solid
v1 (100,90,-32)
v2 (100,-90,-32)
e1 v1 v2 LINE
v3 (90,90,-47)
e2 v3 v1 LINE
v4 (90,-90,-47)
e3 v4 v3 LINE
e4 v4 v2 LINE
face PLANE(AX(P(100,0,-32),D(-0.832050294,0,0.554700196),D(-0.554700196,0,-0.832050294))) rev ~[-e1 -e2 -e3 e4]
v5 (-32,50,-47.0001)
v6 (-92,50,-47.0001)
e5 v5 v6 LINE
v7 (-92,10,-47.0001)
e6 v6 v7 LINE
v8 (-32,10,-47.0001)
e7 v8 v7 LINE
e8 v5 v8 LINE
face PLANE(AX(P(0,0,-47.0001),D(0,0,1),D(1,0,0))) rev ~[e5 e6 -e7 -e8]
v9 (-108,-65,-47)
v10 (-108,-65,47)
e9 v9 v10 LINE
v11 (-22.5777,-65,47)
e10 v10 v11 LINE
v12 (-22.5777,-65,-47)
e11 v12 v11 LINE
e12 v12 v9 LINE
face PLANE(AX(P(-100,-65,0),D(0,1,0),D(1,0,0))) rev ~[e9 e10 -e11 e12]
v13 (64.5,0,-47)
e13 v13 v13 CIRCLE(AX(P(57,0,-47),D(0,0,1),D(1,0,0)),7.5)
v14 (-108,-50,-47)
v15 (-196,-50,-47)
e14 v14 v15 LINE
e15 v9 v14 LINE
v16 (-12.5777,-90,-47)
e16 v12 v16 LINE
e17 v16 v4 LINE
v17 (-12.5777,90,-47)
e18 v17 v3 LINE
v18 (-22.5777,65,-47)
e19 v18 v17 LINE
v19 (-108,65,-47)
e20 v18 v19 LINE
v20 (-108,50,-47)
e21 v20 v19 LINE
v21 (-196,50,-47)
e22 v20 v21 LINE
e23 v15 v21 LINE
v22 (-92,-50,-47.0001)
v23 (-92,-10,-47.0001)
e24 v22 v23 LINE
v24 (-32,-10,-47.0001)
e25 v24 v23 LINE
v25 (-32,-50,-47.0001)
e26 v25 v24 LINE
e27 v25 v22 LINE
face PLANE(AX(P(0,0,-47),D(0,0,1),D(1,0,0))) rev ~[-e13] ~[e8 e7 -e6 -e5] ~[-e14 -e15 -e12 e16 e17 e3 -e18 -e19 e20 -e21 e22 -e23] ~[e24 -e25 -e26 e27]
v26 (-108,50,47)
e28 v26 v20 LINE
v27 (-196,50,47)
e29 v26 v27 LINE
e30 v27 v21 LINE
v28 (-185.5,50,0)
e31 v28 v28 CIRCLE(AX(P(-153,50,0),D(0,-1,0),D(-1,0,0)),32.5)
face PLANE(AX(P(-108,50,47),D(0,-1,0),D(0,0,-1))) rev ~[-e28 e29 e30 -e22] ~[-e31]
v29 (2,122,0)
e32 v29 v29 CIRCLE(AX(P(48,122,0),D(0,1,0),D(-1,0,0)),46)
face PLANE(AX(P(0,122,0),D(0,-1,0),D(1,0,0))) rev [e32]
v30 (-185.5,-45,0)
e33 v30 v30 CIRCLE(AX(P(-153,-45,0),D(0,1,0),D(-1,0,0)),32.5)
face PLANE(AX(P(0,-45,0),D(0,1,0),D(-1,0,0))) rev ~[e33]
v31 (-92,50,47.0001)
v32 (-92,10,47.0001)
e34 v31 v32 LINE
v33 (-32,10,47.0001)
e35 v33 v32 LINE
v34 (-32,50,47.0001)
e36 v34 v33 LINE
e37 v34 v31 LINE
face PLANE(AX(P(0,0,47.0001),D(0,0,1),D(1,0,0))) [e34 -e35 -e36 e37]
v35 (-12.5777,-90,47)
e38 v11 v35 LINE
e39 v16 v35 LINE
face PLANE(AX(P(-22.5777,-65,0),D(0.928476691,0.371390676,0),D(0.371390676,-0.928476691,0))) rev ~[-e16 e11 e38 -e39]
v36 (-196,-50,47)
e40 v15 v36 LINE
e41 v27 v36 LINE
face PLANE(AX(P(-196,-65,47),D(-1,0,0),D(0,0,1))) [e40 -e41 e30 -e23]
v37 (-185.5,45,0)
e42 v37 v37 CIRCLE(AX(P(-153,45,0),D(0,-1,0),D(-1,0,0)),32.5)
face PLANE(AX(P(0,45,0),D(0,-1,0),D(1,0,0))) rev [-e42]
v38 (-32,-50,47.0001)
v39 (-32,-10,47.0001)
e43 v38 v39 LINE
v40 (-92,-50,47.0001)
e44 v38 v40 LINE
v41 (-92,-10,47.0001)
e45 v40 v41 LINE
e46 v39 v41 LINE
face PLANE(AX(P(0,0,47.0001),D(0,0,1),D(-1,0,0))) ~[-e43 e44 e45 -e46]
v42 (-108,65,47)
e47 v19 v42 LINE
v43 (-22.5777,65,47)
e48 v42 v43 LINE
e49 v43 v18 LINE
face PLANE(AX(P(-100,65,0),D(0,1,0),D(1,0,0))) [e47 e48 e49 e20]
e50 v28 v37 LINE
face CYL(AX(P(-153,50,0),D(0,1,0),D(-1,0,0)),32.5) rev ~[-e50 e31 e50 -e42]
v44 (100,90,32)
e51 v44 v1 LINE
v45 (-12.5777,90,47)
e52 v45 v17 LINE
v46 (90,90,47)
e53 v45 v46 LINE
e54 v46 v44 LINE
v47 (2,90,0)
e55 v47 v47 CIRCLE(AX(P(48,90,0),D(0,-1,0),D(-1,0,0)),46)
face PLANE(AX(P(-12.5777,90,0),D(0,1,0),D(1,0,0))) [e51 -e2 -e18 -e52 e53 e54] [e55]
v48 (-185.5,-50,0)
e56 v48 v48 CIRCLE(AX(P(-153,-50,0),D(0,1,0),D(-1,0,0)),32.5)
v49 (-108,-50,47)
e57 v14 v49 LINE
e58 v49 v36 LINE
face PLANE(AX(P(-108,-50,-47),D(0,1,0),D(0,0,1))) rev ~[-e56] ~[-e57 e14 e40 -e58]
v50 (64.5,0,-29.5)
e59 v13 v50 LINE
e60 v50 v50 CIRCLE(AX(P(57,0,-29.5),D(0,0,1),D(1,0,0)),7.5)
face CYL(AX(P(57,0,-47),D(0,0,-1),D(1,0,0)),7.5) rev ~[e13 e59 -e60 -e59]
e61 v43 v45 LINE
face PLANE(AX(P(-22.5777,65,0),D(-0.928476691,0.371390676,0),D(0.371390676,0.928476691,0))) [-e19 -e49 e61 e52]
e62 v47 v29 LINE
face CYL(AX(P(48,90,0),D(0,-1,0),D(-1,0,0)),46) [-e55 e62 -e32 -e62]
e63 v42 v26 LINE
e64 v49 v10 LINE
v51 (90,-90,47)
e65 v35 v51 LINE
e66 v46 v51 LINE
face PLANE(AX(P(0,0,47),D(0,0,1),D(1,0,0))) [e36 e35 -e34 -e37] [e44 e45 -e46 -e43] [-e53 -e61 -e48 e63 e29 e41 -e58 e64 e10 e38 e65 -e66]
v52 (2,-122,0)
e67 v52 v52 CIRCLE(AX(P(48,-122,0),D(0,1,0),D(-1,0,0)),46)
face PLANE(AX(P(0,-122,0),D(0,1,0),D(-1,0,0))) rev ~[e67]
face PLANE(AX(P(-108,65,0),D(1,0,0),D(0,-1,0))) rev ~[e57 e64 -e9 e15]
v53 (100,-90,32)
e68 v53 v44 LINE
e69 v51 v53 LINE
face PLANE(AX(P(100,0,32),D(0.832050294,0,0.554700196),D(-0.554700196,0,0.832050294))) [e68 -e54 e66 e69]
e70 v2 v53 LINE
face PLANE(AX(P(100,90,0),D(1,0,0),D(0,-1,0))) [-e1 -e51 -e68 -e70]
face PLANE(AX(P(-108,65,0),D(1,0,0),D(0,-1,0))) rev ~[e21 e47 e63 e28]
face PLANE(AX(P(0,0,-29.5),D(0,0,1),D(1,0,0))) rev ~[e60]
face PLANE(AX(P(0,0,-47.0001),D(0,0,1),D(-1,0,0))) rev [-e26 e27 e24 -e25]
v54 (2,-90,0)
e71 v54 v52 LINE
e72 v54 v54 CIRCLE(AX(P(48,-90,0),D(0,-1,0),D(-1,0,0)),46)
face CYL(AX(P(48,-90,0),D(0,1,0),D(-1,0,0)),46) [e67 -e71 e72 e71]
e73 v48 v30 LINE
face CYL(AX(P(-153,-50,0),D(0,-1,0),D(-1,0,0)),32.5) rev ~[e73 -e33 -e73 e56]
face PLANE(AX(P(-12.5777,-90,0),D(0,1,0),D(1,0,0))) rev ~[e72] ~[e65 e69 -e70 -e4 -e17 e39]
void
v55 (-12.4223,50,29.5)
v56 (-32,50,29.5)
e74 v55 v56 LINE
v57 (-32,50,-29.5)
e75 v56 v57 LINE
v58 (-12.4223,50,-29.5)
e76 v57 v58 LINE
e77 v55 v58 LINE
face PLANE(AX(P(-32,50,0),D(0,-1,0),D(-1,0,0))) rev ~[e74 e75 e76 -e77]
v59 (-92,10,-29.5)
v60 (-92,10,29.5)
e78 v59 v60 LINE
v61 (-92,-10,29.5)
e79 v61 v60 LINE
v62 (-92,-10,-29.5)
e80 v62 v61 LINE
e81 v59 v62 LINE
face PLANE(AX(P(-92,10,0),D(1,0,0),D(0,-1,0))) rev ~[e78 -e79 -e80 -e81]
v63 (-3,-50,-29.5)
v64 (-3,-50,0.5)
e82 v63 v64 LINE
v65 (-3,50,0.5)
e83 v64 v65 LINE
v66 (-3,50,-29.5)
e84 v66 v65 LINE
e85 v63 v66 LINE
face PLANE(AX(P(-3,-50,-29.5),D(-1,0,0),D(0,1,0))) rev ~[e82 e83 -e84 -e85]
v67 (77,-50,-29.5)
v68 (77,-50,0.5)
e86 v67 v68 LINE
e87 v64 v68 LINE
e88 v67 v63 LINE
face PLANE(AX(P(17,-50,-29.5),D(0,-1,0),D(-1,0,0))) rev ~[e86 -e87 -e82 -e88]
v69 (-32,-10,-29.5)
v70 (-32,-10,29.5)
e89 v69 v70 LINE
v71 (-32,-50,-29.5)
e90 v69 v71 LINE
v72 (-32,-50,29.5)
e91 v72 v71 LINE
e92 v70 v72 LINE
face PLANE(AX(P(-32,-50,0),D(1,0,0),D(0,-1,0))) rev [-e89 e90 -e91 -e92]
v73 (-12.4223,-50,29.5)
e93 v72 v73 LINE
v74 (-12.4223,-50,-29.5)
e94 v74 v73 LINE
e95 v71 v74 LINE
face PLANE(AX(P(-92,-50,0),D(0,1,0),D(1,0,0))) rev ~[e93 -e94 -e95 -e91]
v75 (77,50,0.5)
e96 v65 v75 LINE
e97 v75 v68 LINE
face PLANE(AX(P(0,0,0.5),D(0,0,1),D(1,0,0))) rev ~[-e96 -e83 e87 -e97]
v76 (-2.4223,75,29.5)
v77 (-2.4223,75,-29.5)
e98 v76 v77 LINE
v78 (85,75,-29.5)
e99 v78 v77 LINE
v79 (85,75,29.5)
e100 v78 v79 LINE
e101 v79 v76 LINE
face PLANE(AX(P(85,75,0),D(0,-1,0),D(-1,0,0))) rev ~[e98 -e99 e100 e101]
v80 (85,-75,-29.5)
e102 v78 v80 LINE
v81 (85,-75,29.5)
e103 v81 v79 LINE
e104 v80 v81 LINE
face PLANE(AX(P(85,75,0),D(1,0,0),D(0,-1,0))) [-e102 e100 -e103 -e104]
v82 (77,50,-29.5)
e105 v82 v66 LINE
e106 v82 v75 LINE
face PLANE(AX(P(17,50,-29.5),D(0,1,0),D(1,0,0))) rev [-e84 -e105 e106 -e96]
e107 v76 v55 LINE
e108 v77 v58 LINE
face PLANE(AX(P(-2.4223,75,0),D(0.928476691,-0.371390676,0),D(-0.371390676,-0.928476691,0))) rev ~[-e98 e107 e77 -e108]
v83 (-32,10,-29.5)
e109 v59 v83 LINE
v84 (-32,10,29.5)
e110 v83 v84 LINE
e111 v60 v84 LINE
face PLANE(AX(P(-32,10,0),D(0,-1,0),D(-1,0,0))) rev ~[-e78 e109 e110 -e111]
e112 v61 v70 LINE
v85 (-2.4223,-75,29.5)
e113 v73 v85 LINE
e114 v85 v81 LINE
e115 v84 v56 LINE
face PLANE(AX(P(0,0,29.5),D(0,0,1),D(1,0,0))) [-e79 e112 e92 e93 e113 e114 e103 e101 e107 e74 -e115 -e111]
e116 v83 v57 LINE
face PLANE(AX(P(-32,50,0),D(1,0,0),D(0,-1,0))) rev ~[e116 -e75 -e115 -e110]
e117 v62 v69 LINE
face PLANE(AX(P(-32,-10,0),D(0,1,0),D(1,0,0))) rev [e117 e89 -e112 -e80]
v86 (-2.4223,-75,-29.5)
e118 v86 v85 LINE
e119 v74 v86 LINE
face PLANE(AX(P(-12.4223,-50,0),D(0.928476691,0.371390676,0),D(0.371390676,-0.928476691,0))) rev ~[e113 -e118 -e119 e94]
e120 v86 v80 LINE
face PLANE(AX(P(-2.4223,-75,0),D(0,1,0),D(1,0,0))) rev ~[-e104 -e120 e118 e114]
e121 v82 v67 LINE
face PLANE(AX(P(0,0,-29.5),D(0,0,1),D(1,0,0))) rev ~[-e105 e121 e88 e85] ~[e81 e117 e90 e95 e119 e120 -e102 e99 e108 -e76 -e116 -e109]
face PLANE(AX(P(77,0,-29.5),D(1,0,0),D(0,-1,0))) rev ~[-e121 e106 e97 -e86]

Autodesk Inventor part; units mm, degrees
ref_plane "YZ Plane" through (0, 0, 0) normal (1, 0, 0) x (0, 1, 0)
ref_plane "XZ Plane" through (0, 0, 0) normal (0, 1, 0) x (-1, 0, 0)
sketch "Sketch1" plane through (0, 0, 0) normal (0, 0, 1) x (1, 0, 0)
  line L0 (-100, 0) -> (100, 0) construction
  line L1 (-100, 65) -> (-100, -65)
  circle A0 centre (-52.5, 57.5) radius 2.25
  line L2 (100, -70) -> (100, 70) construction
  line L3 (-92, 0) -> (-92, 57.5) construction
  line L4 (-92, 0) -> (-92, -57.5) construction
  circle A1 centre (-92.5, 57.5) radius 2.25
  circle A2 centre (-92.5, 57.5) radius 1.25
  circle A3 centre (-52.5, 57.5) radius 1.25
  line L5 (-100, 65) -> (-22.5777, 65)
  line L6 (-22.5777, 65) -> (-12.5777, 90)
  line L7 (-12.5777, 90) -> (100, 90)
  line L8 (100, 90) -> (100, 0)
  line L9 (100, -90) -> (100, 0)
  line L10 (-12.5777, -90) -> (100, -90)
  line L11 (-22.5777, -65) -> (-12.5777, -90)
  line L12 (-100, -65) -> (-22.5777, -65)
  line L13 (85, 75) -> (-2.4223, 75)
  line L14 (-2.4223, 75) -> (-12.4223, 50)
  line L15 (-12.4223, 50) -> (-92, 50)
  line L16 (-92, -50) -> (-12.4223, -50)
  line L17 (-12.4223, -50) -> (-2.4223, -75)
  line L18 (-2.4223, -75) -> (85, -75)
  line L19 (92.5, 82.5) -> (-7.5, 82.5) construction
  line L20 (-7.5, 82.5) -> (-17.5, 57.5) construction
  line L21 (-17.5, 57.5) -> (-92.5, 57.5) construction
  line L22 (-92.5, 57.5) -> (-92.5, -57.5) construction
  line L23 (-92.5, -57.5) -> (-17.5, -57.5) construction
  line L24 (-17.5, -57.5) -> (-7.5, -82.5) construction
  line L25 (-7.5, -82.5) -> (92.5, -82.5) construction
  line L26 (92.5, -82.5) -> (92.5, 0) construction
  line L27 (92.5, 0) -> (92.5, 82.5) construction
  line L28 (85, 75) -> (85, -75)
  line L29 (-100, 65) -> (-108, 65)
  line L30 (-108, 65) -> (-108, -65)
  line L31 (-108, -65) -> (-100, -65)
  line L32 (-100, -65) -> (-100, 65)
  line L33 (100, 0) -> (-108, 0)
  circle A4 centre (20, 82.5) radius 1.25
  circle A5 centre (20, 82.5) radius 2.25
  circle A6 centre (80, 82.5) radius 1.25
  circle A7 centre (80, 82.5) radius 2.25
  line L34 (50, 90) -> (50, 75) construction
  circle A8 centre (-12.5, 70) radius 1.25
  circle A9 centre (-12.5, 70) radius 2.25
  line L35 (-92, 50) -> (-92, -50)
  circle A10 centre (-96, 0) radius 2.25
  circle A11 centre (-96, 0) radius 1.25
  circle A12 centre (-104, 30) radius 2.25
  circle A13 centre (-104, 30) radius 1.25
  circle A14 centre (-104, -30) radius 2.25
  circle A15 centre (-104, -30) radius 1.25
  line L36 (-104, 65) -> (-104, -65) construction
  line L37 (-32, 50) -> (-32, 10)
  line L38 (-32, 10) -> (-92, 10)
  line L39 (77, 0) -> (77, -50)
  line L40 (77, -50) -> (-3, -50)
  line L41 (-3, -50) -> (-3, 0)
  line L42 (77, -40) -> (67, -40)
  line L43 (67, -40) -> (67, -50)
  line L44 (27, -50) -> (27, -40)
  line L45 (27, -40) -> (17, -40)
  line L46 (17, -40) -> (17, -50)
  circle A16 centre (57, 0) radius 7.5
  point P0 (0, 0)
  point P1 (0, 0)
  point P2 (77, 0)
  point P3 (-3, 0)
  dimension "d0" = 130
  dimension "d1" = 8
  dimension "d2" = 200
  dimension "d15" = 15
  dimension "d17" = 7.5
  dimension "d18" = 4.5
  dimension "d19" = 2.5
  dimension "d20" = 40
  dimension "d21" = 180
  dimension "d22" = 15
  dimension "d24" = 8
  dimension "d28" = 20
  dimension "d29" = 50
  dimension "d30" = 40
  dimension "d40" = 30
  dimension "d41" = 4
  dimension "d110" = 40
  dimension "d111" = 60
  dimension "d114" = 10
  dimension "d115" = 8
  dimension "d132" = 50
  dimension "d133" = 80
  dimension "d135" = 15
  dimension "d138" = 20
  dimension "d139" = 29
  dimension "d140" = 40
  dimension "d141" = 10
sketch "Sketch6" plane through (0, 0, 0) normal (0, 0, 1) x (1, 0, 0)
  line L0 (0, -140.4945) -> (0, 142.9668) construction
  line L1 (59.9258, 0) -> (340.445, 0) construction
  line L2 (100, -70) -> (100, 70) construction
  line L3 (300, -100) -> (100, -70)
  line L4 (300, 100) -> (100, 70)
  dimension "d146" = 300
  dimension "d147" = 100
ref_plane "Work Plane2" through (300, 100, 0) normal (-0.9889364, -0.1483405, 0) x (0.1483405, -0.9889364, 0)
sketch "Sketch7" plane through (300, 100, 0) normal (-0.9889364, -0.1483405, 0) x (0.1483405, -0.9889364, 0)
  circle A0 centre (0, 0) radius 2.5
  dimension "d150" = 5
extrude "Extrusion1" add sketch "Sketch1" along normal mid plane 94 contours L5 L6 L7 L8 L33 L28 L13 L14 L15 L35 A10 L1 | L1 L33 L30 L29 | L33 A10 L35 L16 L17 L18 L28 L9 L10 L11 L12 L1 | L1 L31 L30 L33 | A10 L33 A11 | L33 A11 A10 | A11 L33 | L33 A11 | L35 L38 L37 L15 L14 L13 L28 L33 A16 | L33 L41 L40 L39 L28 L18 L17 L16 L35 | L33 A16 L39 L42 L43 L40 L44 L45 L46 L41 | L35 L15 L37 L38 | A16 L33 | L33 A16 | L46 L45 L44 L40 | L39 L40 L43 L42 | A0 | A1 | A2 | A3 | A4 | A5 | A6 | A7 | A8 | A9 | A12 | A13 | A14 | A15
extrude "Extrusion2" cut sketch "Sketch1" along normal mid plane 59 contours L35 L38 L37 L15 L14 L13 L28 L33 A16 | L33 L41 L40 L39 L28 L18 L17 L16 L35 | L33 A16 L39 L42 L43 L40 L44 L45 L46 L41 | L35 L15 L37 L38 | A16 L33 | L33 A16 | L46 L45 L44 L40 | L39 L40 L43 L42
sketch "Sketch2" plane through (-108, -65, 47) normal (-1, 0, 0) x (0, 0, 1)
  line L0 (0, -25) -> (0, 155) projected
  line L1 (-94, 15) -> (0, 15)
  line L2 (0, 15) -> (0, 115)
  line L3 (0, 115) -> (-94, 115)
  line L4 (-94, 115) -> (-94, 15)
  line L5 (-94, 15) -> (0, 115) construction
  line L6 (0, 15) -> (-94, 115) construction
  line L7 (-94, 42) -> (0, 42)
  line L8 (0, 42) -> (0, 88)
  line L9 (0, 88) -> (-94, 88)
  line L10 (-94, 88) -> (-94, 42)
  line L11 (-94, 42) -> (0, 88) construction
  line L12 (0, 42) -> (-94, 88) construction
  point P0 (-47, 65)
  dimension "d52" = 100
  dimension "d55" = 46
extrude "Extrusion3" add sketch "Sketch2" along normal blind 88
extrude "Extrusion4" [suppressed]
sketch "Sketch3" plane through (0, 0, 0) normal (0, 1, 0) x (-1, 0, 0)
  circle A0 centre (153, 0) radius 32.5
  line L0 (108, -47) -> (108, 47) projected
  line L1 (108, -47) -> (108, 47) projected
  line L2 (108, -47) -> (108, 47) construction
  line L3 (108, 0) -> (245.8238, 0) construction
  circle A1 centre (153, 0) radius 40
  line L4 (183.942, 9.942) -> (196, 22)
  line L5 (196, 22) -> (196, -22)
  line L6 (196, -22) -> (183.942, -9.942)
  line L7 (196, 47) -> (196, -47) projected
  line L8 (204, 47) -> (224, 20)
  line L9 (224, 20) -> (224, 47)
  line L10 (224, 47) -> (204, 47)
  line L11 (196, -47) -> (224, -47)
  line L12 (204, -47) -> (224, -20)
  line L13 (224, -20) -> (224, -47)
  line L14 (-100, 47) -> (12.5777, 47) projected
  line L15 (-100, 47) -> (-100, 32)
  line L16 (-100, 32) -> (-90, 47)
  line L17 (-100, -47) -> (12.5777, -47)
  line L18 (-100, -47) -> (-100, -32)
  line L19 (-100, -32) -> (-90, -47)
  circle A2 centre (-48, 0) radius 46
  line L20 (-100, 47) -> (-100, -47) projected
  circle A3 centre (-48, 0) radius 32.5
  line L21 (-4.8723, -16) -> (13.1277, -16)
  line L22 (13.1277, -16) -> (13.1277, 16)
  line L23 (13.1277, 16) -> (-4.8723, 16)
  point P0 (0, 0)
  point P1 (189.7631, 15.7631)
  point P2 (189.7631, -15.7631)
  dimension "d58" = 45
  dimension "d59" = 65
  dimension "d62" = 80
  dimension "d64" = 44
  dimension "d69" = 20
  dimension "d70" = 27
  dimension "d80" = 15
  dimension "d81" = 10
  dimension "d87" = 52
  dimension "d88" = 92
  dimension "d116" = 65
  dimension "d121" = 32
  dimension "d122" = 18
  dimension "d134" = 8
  dimension "d143" = 48
extrude "Extrusion15" cut sketch "Sketch3" along normal through all both and the other way through all contours L10 L9 L8 | L12 L13 L11 | L14 L16 L15 | L18 L19 L17
extrude "Extrusion16" add sketch "Sketch1" along normal through all both and the other way through all contours L35 L15 L37 L38
extrude "Extrusion14" add sketch "Sketch3" against normal blind 32 from surface at -90 contours A2 | A3
extrude "Extrusion17" [suppressed]
extrude "Extrusion18" cut sketch "Sketch3" along normal blind 5 from surface at -50 contours A0
extrude "Extrusion21" cut sketch "Sketch1" along normal up to surface (17.5 mm away) from surface at -47 contours A16 L33 | L33 A16
extrude "Extrusion22" add sketch "Sketch1" along normal blind 30 from surface at -29.5 contours L33 A16 L39 L42 L43 L40 L44 L45 L46 L41 | L33 A16 | L46 L45 L44 L40 | L39 L40 L43 L42 picked at (58.4928, -2.6557)
extrude "Extrusion24" [suppressed]
mirror "Mirror2" about plane through (0, 0, 0) normal (0, 1, 0) of "Extrusion14", "Extrusion16", "Extrusion18", "Extrusion22"
equation "\"d17\" = 0.5 * d15"
equation "\"d21\" = d47"
equation "\"d45\" = 124"
equation "\"d46\" = 12"
equation "\"d47\" = 180"
